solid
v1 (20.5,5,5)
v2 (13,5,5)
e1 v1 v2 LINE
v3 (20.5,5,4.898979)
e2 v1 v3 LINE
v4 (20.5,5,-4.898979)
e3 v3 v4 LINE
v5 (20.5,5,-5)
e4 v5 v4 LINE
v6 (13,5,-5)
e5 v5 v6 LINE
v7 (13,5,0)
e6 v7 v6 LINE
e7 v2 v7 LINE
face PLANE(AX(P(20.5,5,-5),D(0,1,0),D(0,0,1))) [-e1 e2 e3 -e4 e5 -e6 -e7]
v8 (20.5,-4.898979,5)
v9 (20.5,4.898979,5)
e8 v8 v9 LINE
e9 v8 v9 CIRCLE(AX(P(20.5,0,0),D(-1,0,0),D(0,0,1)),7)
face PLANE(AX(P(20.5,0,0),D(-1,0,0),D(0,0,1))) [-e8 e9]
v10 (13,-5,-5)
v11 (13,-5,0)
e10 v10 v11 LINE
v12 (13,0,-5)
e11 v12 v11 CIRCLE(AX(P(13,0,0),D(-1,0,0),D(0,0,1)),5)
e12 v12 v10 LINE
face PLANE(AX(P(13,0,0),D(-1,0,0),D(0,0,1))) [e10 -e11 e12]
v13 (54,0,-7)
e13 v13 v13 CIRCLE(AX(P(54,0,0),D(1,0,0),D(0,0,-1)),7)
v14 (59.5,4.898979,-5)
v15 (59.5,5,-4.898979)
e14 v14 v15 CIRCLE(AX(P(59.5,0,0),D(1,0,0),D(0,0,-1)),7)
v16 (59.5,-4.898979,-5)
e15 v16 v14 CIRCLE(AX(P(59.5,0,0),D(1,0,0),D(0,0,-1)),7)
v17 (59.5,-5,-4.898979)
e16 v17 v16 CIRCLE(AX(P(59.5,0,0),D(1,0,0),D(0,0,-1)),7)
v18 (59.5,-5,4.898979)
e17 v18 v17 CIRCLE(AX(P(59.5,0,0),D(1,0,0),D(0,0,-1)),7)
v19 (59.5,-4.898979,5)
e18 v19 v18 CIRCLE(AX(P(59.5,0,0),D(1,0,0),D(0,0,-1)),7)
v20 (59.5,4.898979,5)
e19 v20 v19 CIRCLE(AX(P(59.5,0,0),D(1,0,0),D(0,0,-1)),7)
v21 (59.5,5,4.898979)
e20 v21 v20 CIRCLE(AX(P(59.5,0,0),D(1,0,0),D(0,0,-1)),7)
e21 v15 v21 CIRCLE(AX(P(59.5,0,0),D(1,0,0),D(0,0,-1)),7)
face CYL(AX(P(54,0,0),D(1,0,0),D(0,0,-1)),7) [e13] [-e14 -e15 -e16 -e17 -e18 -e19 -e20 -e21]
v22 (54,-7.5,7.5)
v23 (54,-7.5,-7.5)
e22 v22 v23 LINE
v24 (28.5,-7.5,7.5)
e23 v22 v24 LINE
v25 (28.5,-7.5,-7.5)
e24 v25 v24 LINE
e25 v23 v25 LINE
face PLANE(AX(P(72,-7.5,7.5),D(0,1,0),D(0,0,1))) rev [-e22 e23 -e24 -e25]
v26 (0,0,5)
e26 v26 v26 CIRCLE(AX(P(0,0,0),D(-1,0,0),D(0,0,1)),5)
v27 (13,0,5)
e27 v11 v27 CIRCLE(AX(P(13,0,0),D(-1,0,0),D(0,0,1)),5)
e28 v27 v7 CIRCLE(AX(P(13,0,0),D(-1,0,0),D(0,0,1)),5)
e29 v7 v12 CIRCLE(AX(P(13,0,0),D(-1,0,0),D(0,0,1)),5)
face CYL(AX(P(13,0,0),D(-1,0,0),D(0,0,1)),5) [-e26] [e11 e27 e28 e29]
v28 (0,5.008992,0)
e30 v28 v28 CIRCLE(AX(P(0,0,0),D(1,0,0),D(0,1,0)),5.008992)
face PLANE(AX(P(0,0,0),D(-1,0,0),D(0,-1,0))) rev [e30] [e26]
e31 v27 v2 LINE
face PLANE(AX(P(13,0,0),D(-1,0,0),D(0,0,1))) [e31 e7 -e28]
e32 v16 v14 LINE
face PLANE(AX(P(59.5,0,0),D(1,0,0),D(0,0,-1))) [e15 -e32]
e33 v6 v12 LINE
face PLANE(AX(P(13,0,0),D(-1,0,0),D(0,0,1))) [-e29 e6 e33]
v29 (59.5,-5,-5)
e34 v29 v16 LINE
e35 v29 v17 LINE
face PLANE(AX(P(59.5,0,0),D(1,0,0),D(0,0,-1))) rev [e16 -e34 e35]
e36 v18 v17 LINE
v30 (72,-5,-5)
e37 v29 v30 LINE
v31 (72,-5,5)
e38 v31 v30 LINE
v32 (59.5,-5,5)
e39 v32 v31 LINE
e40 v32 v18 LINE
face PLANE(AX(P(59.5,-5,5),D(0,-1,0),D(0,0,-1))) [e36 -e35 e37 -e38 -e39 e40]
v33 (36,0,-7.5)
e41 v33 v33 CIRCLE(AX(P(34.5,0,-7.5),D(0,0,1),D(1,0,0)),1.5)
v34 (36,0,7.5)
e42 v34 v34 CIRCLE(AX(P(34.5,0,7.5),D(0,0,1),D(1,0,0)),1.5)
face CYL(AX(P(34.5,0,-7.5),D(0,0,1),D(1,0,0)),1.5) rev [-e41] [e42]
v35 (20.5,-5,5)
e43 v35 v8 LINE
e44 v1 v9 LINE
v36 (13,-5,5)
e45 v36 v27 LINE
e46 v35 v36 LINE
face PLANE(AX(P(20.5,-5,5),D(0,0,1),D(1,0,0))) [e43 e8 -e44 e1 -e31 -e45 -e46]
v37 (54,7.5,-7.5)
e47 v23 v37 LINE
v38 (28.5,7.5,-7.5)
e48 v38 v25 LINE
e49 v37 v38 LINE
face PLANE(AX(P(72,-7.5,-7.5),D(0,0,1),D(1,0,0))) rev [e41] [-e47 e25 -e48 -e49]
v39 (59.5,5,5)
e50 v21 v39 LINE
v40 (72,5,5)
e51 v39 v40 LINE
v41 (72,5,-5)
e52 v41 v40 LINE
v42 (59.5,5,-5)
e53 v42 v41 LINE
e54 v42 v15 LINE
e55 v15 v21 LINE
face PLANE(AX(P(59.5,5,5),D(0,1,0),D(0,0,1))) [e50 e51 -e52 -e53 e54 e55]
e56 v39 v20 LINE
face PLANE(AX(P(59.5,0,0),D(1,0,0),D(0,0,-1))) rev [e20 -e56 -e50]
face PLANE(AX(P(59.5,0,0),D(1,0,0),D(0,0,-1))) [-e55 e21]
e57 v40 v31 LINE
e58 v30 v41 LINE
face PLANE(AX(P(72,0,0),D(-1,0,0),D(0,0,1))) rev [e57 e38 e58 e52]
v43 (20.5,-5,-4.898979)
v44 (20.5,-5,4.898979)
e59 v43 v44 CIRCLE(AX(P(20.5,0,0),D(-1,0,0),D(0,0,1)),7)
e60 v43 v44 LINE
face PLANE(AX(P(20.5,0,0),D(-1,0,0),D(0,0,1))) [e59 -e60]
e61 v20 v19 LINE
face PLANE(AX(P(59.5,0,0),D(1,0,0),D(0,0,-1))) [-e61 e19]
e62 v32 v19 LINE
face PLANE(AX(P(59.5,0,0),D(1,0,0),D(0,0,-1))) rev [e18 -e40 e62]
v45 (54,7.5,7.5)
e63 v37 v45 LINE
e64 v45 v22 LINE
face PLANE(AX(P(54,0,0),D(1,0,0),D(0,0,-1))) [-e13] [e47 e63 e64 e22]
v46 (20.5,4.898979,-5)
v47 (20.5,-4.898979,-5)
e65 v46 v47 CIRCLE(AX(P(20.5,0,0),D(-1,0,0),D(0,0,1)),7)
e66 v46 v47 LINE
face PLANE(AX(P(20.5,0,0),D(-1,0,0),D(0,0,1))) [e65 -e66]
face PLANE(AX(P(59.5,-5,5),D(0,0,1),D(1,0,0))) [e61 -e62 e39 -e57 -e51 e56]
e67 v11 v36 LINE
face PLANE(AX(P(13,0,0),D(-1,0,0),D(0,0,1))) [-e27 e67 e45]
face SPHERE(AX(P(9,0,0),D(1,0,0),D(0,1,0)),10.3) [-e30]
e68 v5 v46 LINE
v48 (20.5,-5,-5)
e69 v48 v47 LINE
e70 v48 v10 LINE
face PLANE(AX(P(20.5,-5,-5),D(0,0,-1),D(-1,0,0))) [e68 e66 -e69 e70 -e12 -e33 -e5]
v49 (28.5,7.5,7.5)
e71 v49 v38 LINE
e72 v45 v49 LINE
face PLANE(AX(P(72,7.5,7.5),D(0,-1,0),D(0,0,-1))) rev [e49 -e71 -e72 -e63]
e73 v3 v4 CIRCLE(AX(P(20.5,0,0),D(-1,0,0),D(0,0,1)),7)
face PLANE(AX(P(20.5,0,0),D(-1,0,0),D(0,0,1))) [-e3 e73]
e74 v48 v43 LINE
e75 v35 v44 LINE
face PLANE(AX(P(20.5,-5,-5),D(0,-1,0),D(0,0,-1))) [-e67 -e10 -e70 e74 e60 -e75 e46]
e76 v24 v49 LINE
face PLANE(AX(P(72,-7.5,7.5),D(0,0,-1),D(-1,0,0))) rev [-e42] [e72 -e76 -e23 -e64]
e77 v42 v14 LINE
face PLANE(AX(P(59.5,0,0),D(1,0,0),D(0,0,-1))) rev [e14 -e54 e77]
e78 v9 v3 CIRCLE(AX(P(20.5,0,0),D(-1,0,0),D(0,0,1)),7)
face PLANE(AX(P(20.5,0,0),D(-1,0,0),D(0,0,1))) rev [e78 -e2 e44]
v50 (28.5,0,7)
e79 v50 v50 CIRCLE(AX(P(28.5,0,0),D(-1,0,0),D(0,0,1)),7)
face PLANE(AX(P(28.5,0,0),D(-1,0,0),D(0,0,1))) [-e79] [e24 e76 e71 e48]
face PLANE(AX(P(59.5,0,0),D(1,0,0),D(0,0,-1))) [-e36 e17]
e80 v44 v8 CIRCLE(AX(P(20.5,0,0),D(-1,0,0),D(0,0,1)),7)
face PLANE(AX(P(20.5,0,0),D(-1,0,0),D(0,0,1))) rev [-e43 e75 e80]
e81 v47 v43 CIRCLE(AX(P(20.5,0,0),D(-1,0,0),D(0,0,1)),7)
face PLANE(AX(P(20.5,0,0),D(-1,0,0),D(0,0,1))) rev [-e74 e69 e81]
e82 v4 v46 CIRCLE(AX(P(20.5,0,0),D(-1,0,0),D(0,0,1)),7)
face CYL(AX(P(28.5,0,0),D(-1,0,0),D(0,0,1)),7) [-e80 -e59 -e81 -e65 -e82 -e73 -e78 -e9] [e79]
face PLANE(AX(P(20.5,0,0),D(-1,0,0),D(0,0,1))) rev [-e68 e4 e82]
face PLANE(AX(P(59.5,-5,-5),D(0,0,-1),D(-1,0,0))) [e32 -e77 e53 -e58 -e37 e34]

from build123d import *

# Parameters (mm, degrees)
SCHIZZO1_W                    = 15
SCHIZZO1_H                    = 15
ESTRUSIONE_ESTRUSIONE1_DEPTH  = 72
SCHIZZO2_W                    = 15
SCHIZZO2_H                    = 15
SCHIZZO2_R                    = 5
TAGLIO_ESTRUSIONE1_DEPTH      = 13
SCHIZZO3_W                    = 15
SCHIZZO3_H                    = 15
SCHIZZO3_W_2                  = 10
SCHIZZO3_H_2                  = 10
TAGLIO_ESTRUSIONE2_DEPTH      = 7.5
SCHIZZO4_W                    = 15
SCHIZZO4_H                    = 15
SCHIZZO4_R                    = 7
TAGLIO_ESTRUSIONE3_DEPTH      = 8
SCHIZZO6_W                    = 15
SCHIZZO6_H                    = 15
SCHIZZO6_W_2                  = 10
SCHIZZO6_H_2                  = 10
TAGLIO_ESTRUSIONE4_DEPTH      = 12.5
TAGLIO_ESTRUSIONE5_START      = -5.5
SCHIZZO8_W                    = 15
SCHIZZO8_H                    = 15
SCHIZZO8_R                    = 7
TAGLIO_ESTRUSIONE5_DEPTH      = 5.5
TAGLIO_ESTRUSIONE6_DEPTH      = 73.777056824
TAGLIO_ESTRUSIONE6_DEPTH_BACK = 73.777056824
SCHIZZO9_R                    = 1.5


with BuildPart() as part:
    # Schizzo1 → Estrusione-Estrusione1 (new body)
    with BuildSketch(Plane(origin=(0, 0, 0), x_dir=(0, 0, -1), z_dir=(1, 0, 0))):
        Rectangle(SCHIZZO1_W, SCHIZZO1_H)
    extrude(amount=ESTRUSIONE_ESTRUSIONE1_DEPTH)

    # Schizzo2 → Taglio-Estrusione1 (cut)
    with BuildSketch(Plane.ZY):
        Rectangle(SCHIZZO2_W, SCHIZZO2_H)
        Circle(SCHIZZO2_R, mode=Mode.SUBTRACT)
    extrude(amount=-TAGLIO_ESTRUSIONE1_DEPTH, mode=Mode.SUBTRACT)

    # Schizzo3 → Taglio-Estrusione2 (cut)
    with BuildSketch(Plane.ZY.offset(-13)):
        Rectangle(SCHIZZO3_W, SCHIZZO3_H)
        Rectangle(SCHIZZO3_W_2, SCHIZZO3_H_2, mode=Mode.SUBTRACT)
    extrude(amount=-TAGLIO_ESTRUSIONE2_DEPTH, mode=Mode.SUBTRACT)

    # Schizzo4 → Taglio-Estrusione3 (cut)
    with BuildSketch(Plane.ZY.offset(-20.5)):
        Rectangle(SCHIZZO4_W, SCHIZZO4_H)
        Circle(SCHIZZO4_R, mode=Mode.SUBTRACT)
    extrude(amount=-TAGLIO_ESTRUSIONE3_DEPTH, mode=Mode.SUBTRACT)

    # Schizzo5 → Rivoluzione1 (revolve)
    with BuildSketch(Plane.XY):
        with BuildLine():
            Line((0, 0), (0, 5.008991915))
            ThreePointArc((0, 5.008991915), (-0.969704108, 2.587469807), (-1.3, 0))
            Line((-1.3, 0), (0, 0))
        make_face()
    revolve(axis=Axis((0, 0, 0), (-1, 0, 0)))

    # Schizzo6 → Taglio-Estrusione4 (cut)
    with BuildSketch(Plane(origin=(72, 0, 0), x_dir=(0, 0, -1), z_dir=(1, 0, 0))):
        Rectangle(SCHIZZO6_W, SCHIZZO6_H)
        Rectangle(SCHIZZO6_W_2, SCHIZZO6_H_2, mode=Mode.SUBTRACT)
    extrude(amount=-TAGLIO_ESTRUSIONE4_DEPTH, mode=Mode.SUBTRACT)

    # Schizzo8 → Taglio-Estrusione5 (cut)
    with BuildSketch(Plane(origin=(59.5, 0, 0), x_dir=(0, 0, -1), z_dir=(1, 0, 0)).offset(TAGLIO_ESTRUSIONE5_START)):
        Rectangle(SCHIZZO8_W, SCHIZZO8_H)
        Circle(SCHIZZO8_R, mode=Mode.SUBTRACT)
    extrude(amount=TAGLIO_ESTRUSIONE5_DEPTH, mode=Mode.SUBTRACT)

    # Schizzo9 → Taglio-Estrusione6 (cut, two sides: drawn at the far end of the back side and taken through both)
    with BuildSketch(Plane.XY.offset(-TAGLIO_ESTRUSIONE6_DEPTH_BACK)):
        with Locations((34.5, 0)):
            Circle(SCHIZZO9_R)
    extrude(amount=TAGLIO_ESTRUSIONE6_DEPTH + TAGLIO_ESTRUSIONE6_DEPTH_BACK, mode=Mode.SUBTRACT)


solid = part.part
